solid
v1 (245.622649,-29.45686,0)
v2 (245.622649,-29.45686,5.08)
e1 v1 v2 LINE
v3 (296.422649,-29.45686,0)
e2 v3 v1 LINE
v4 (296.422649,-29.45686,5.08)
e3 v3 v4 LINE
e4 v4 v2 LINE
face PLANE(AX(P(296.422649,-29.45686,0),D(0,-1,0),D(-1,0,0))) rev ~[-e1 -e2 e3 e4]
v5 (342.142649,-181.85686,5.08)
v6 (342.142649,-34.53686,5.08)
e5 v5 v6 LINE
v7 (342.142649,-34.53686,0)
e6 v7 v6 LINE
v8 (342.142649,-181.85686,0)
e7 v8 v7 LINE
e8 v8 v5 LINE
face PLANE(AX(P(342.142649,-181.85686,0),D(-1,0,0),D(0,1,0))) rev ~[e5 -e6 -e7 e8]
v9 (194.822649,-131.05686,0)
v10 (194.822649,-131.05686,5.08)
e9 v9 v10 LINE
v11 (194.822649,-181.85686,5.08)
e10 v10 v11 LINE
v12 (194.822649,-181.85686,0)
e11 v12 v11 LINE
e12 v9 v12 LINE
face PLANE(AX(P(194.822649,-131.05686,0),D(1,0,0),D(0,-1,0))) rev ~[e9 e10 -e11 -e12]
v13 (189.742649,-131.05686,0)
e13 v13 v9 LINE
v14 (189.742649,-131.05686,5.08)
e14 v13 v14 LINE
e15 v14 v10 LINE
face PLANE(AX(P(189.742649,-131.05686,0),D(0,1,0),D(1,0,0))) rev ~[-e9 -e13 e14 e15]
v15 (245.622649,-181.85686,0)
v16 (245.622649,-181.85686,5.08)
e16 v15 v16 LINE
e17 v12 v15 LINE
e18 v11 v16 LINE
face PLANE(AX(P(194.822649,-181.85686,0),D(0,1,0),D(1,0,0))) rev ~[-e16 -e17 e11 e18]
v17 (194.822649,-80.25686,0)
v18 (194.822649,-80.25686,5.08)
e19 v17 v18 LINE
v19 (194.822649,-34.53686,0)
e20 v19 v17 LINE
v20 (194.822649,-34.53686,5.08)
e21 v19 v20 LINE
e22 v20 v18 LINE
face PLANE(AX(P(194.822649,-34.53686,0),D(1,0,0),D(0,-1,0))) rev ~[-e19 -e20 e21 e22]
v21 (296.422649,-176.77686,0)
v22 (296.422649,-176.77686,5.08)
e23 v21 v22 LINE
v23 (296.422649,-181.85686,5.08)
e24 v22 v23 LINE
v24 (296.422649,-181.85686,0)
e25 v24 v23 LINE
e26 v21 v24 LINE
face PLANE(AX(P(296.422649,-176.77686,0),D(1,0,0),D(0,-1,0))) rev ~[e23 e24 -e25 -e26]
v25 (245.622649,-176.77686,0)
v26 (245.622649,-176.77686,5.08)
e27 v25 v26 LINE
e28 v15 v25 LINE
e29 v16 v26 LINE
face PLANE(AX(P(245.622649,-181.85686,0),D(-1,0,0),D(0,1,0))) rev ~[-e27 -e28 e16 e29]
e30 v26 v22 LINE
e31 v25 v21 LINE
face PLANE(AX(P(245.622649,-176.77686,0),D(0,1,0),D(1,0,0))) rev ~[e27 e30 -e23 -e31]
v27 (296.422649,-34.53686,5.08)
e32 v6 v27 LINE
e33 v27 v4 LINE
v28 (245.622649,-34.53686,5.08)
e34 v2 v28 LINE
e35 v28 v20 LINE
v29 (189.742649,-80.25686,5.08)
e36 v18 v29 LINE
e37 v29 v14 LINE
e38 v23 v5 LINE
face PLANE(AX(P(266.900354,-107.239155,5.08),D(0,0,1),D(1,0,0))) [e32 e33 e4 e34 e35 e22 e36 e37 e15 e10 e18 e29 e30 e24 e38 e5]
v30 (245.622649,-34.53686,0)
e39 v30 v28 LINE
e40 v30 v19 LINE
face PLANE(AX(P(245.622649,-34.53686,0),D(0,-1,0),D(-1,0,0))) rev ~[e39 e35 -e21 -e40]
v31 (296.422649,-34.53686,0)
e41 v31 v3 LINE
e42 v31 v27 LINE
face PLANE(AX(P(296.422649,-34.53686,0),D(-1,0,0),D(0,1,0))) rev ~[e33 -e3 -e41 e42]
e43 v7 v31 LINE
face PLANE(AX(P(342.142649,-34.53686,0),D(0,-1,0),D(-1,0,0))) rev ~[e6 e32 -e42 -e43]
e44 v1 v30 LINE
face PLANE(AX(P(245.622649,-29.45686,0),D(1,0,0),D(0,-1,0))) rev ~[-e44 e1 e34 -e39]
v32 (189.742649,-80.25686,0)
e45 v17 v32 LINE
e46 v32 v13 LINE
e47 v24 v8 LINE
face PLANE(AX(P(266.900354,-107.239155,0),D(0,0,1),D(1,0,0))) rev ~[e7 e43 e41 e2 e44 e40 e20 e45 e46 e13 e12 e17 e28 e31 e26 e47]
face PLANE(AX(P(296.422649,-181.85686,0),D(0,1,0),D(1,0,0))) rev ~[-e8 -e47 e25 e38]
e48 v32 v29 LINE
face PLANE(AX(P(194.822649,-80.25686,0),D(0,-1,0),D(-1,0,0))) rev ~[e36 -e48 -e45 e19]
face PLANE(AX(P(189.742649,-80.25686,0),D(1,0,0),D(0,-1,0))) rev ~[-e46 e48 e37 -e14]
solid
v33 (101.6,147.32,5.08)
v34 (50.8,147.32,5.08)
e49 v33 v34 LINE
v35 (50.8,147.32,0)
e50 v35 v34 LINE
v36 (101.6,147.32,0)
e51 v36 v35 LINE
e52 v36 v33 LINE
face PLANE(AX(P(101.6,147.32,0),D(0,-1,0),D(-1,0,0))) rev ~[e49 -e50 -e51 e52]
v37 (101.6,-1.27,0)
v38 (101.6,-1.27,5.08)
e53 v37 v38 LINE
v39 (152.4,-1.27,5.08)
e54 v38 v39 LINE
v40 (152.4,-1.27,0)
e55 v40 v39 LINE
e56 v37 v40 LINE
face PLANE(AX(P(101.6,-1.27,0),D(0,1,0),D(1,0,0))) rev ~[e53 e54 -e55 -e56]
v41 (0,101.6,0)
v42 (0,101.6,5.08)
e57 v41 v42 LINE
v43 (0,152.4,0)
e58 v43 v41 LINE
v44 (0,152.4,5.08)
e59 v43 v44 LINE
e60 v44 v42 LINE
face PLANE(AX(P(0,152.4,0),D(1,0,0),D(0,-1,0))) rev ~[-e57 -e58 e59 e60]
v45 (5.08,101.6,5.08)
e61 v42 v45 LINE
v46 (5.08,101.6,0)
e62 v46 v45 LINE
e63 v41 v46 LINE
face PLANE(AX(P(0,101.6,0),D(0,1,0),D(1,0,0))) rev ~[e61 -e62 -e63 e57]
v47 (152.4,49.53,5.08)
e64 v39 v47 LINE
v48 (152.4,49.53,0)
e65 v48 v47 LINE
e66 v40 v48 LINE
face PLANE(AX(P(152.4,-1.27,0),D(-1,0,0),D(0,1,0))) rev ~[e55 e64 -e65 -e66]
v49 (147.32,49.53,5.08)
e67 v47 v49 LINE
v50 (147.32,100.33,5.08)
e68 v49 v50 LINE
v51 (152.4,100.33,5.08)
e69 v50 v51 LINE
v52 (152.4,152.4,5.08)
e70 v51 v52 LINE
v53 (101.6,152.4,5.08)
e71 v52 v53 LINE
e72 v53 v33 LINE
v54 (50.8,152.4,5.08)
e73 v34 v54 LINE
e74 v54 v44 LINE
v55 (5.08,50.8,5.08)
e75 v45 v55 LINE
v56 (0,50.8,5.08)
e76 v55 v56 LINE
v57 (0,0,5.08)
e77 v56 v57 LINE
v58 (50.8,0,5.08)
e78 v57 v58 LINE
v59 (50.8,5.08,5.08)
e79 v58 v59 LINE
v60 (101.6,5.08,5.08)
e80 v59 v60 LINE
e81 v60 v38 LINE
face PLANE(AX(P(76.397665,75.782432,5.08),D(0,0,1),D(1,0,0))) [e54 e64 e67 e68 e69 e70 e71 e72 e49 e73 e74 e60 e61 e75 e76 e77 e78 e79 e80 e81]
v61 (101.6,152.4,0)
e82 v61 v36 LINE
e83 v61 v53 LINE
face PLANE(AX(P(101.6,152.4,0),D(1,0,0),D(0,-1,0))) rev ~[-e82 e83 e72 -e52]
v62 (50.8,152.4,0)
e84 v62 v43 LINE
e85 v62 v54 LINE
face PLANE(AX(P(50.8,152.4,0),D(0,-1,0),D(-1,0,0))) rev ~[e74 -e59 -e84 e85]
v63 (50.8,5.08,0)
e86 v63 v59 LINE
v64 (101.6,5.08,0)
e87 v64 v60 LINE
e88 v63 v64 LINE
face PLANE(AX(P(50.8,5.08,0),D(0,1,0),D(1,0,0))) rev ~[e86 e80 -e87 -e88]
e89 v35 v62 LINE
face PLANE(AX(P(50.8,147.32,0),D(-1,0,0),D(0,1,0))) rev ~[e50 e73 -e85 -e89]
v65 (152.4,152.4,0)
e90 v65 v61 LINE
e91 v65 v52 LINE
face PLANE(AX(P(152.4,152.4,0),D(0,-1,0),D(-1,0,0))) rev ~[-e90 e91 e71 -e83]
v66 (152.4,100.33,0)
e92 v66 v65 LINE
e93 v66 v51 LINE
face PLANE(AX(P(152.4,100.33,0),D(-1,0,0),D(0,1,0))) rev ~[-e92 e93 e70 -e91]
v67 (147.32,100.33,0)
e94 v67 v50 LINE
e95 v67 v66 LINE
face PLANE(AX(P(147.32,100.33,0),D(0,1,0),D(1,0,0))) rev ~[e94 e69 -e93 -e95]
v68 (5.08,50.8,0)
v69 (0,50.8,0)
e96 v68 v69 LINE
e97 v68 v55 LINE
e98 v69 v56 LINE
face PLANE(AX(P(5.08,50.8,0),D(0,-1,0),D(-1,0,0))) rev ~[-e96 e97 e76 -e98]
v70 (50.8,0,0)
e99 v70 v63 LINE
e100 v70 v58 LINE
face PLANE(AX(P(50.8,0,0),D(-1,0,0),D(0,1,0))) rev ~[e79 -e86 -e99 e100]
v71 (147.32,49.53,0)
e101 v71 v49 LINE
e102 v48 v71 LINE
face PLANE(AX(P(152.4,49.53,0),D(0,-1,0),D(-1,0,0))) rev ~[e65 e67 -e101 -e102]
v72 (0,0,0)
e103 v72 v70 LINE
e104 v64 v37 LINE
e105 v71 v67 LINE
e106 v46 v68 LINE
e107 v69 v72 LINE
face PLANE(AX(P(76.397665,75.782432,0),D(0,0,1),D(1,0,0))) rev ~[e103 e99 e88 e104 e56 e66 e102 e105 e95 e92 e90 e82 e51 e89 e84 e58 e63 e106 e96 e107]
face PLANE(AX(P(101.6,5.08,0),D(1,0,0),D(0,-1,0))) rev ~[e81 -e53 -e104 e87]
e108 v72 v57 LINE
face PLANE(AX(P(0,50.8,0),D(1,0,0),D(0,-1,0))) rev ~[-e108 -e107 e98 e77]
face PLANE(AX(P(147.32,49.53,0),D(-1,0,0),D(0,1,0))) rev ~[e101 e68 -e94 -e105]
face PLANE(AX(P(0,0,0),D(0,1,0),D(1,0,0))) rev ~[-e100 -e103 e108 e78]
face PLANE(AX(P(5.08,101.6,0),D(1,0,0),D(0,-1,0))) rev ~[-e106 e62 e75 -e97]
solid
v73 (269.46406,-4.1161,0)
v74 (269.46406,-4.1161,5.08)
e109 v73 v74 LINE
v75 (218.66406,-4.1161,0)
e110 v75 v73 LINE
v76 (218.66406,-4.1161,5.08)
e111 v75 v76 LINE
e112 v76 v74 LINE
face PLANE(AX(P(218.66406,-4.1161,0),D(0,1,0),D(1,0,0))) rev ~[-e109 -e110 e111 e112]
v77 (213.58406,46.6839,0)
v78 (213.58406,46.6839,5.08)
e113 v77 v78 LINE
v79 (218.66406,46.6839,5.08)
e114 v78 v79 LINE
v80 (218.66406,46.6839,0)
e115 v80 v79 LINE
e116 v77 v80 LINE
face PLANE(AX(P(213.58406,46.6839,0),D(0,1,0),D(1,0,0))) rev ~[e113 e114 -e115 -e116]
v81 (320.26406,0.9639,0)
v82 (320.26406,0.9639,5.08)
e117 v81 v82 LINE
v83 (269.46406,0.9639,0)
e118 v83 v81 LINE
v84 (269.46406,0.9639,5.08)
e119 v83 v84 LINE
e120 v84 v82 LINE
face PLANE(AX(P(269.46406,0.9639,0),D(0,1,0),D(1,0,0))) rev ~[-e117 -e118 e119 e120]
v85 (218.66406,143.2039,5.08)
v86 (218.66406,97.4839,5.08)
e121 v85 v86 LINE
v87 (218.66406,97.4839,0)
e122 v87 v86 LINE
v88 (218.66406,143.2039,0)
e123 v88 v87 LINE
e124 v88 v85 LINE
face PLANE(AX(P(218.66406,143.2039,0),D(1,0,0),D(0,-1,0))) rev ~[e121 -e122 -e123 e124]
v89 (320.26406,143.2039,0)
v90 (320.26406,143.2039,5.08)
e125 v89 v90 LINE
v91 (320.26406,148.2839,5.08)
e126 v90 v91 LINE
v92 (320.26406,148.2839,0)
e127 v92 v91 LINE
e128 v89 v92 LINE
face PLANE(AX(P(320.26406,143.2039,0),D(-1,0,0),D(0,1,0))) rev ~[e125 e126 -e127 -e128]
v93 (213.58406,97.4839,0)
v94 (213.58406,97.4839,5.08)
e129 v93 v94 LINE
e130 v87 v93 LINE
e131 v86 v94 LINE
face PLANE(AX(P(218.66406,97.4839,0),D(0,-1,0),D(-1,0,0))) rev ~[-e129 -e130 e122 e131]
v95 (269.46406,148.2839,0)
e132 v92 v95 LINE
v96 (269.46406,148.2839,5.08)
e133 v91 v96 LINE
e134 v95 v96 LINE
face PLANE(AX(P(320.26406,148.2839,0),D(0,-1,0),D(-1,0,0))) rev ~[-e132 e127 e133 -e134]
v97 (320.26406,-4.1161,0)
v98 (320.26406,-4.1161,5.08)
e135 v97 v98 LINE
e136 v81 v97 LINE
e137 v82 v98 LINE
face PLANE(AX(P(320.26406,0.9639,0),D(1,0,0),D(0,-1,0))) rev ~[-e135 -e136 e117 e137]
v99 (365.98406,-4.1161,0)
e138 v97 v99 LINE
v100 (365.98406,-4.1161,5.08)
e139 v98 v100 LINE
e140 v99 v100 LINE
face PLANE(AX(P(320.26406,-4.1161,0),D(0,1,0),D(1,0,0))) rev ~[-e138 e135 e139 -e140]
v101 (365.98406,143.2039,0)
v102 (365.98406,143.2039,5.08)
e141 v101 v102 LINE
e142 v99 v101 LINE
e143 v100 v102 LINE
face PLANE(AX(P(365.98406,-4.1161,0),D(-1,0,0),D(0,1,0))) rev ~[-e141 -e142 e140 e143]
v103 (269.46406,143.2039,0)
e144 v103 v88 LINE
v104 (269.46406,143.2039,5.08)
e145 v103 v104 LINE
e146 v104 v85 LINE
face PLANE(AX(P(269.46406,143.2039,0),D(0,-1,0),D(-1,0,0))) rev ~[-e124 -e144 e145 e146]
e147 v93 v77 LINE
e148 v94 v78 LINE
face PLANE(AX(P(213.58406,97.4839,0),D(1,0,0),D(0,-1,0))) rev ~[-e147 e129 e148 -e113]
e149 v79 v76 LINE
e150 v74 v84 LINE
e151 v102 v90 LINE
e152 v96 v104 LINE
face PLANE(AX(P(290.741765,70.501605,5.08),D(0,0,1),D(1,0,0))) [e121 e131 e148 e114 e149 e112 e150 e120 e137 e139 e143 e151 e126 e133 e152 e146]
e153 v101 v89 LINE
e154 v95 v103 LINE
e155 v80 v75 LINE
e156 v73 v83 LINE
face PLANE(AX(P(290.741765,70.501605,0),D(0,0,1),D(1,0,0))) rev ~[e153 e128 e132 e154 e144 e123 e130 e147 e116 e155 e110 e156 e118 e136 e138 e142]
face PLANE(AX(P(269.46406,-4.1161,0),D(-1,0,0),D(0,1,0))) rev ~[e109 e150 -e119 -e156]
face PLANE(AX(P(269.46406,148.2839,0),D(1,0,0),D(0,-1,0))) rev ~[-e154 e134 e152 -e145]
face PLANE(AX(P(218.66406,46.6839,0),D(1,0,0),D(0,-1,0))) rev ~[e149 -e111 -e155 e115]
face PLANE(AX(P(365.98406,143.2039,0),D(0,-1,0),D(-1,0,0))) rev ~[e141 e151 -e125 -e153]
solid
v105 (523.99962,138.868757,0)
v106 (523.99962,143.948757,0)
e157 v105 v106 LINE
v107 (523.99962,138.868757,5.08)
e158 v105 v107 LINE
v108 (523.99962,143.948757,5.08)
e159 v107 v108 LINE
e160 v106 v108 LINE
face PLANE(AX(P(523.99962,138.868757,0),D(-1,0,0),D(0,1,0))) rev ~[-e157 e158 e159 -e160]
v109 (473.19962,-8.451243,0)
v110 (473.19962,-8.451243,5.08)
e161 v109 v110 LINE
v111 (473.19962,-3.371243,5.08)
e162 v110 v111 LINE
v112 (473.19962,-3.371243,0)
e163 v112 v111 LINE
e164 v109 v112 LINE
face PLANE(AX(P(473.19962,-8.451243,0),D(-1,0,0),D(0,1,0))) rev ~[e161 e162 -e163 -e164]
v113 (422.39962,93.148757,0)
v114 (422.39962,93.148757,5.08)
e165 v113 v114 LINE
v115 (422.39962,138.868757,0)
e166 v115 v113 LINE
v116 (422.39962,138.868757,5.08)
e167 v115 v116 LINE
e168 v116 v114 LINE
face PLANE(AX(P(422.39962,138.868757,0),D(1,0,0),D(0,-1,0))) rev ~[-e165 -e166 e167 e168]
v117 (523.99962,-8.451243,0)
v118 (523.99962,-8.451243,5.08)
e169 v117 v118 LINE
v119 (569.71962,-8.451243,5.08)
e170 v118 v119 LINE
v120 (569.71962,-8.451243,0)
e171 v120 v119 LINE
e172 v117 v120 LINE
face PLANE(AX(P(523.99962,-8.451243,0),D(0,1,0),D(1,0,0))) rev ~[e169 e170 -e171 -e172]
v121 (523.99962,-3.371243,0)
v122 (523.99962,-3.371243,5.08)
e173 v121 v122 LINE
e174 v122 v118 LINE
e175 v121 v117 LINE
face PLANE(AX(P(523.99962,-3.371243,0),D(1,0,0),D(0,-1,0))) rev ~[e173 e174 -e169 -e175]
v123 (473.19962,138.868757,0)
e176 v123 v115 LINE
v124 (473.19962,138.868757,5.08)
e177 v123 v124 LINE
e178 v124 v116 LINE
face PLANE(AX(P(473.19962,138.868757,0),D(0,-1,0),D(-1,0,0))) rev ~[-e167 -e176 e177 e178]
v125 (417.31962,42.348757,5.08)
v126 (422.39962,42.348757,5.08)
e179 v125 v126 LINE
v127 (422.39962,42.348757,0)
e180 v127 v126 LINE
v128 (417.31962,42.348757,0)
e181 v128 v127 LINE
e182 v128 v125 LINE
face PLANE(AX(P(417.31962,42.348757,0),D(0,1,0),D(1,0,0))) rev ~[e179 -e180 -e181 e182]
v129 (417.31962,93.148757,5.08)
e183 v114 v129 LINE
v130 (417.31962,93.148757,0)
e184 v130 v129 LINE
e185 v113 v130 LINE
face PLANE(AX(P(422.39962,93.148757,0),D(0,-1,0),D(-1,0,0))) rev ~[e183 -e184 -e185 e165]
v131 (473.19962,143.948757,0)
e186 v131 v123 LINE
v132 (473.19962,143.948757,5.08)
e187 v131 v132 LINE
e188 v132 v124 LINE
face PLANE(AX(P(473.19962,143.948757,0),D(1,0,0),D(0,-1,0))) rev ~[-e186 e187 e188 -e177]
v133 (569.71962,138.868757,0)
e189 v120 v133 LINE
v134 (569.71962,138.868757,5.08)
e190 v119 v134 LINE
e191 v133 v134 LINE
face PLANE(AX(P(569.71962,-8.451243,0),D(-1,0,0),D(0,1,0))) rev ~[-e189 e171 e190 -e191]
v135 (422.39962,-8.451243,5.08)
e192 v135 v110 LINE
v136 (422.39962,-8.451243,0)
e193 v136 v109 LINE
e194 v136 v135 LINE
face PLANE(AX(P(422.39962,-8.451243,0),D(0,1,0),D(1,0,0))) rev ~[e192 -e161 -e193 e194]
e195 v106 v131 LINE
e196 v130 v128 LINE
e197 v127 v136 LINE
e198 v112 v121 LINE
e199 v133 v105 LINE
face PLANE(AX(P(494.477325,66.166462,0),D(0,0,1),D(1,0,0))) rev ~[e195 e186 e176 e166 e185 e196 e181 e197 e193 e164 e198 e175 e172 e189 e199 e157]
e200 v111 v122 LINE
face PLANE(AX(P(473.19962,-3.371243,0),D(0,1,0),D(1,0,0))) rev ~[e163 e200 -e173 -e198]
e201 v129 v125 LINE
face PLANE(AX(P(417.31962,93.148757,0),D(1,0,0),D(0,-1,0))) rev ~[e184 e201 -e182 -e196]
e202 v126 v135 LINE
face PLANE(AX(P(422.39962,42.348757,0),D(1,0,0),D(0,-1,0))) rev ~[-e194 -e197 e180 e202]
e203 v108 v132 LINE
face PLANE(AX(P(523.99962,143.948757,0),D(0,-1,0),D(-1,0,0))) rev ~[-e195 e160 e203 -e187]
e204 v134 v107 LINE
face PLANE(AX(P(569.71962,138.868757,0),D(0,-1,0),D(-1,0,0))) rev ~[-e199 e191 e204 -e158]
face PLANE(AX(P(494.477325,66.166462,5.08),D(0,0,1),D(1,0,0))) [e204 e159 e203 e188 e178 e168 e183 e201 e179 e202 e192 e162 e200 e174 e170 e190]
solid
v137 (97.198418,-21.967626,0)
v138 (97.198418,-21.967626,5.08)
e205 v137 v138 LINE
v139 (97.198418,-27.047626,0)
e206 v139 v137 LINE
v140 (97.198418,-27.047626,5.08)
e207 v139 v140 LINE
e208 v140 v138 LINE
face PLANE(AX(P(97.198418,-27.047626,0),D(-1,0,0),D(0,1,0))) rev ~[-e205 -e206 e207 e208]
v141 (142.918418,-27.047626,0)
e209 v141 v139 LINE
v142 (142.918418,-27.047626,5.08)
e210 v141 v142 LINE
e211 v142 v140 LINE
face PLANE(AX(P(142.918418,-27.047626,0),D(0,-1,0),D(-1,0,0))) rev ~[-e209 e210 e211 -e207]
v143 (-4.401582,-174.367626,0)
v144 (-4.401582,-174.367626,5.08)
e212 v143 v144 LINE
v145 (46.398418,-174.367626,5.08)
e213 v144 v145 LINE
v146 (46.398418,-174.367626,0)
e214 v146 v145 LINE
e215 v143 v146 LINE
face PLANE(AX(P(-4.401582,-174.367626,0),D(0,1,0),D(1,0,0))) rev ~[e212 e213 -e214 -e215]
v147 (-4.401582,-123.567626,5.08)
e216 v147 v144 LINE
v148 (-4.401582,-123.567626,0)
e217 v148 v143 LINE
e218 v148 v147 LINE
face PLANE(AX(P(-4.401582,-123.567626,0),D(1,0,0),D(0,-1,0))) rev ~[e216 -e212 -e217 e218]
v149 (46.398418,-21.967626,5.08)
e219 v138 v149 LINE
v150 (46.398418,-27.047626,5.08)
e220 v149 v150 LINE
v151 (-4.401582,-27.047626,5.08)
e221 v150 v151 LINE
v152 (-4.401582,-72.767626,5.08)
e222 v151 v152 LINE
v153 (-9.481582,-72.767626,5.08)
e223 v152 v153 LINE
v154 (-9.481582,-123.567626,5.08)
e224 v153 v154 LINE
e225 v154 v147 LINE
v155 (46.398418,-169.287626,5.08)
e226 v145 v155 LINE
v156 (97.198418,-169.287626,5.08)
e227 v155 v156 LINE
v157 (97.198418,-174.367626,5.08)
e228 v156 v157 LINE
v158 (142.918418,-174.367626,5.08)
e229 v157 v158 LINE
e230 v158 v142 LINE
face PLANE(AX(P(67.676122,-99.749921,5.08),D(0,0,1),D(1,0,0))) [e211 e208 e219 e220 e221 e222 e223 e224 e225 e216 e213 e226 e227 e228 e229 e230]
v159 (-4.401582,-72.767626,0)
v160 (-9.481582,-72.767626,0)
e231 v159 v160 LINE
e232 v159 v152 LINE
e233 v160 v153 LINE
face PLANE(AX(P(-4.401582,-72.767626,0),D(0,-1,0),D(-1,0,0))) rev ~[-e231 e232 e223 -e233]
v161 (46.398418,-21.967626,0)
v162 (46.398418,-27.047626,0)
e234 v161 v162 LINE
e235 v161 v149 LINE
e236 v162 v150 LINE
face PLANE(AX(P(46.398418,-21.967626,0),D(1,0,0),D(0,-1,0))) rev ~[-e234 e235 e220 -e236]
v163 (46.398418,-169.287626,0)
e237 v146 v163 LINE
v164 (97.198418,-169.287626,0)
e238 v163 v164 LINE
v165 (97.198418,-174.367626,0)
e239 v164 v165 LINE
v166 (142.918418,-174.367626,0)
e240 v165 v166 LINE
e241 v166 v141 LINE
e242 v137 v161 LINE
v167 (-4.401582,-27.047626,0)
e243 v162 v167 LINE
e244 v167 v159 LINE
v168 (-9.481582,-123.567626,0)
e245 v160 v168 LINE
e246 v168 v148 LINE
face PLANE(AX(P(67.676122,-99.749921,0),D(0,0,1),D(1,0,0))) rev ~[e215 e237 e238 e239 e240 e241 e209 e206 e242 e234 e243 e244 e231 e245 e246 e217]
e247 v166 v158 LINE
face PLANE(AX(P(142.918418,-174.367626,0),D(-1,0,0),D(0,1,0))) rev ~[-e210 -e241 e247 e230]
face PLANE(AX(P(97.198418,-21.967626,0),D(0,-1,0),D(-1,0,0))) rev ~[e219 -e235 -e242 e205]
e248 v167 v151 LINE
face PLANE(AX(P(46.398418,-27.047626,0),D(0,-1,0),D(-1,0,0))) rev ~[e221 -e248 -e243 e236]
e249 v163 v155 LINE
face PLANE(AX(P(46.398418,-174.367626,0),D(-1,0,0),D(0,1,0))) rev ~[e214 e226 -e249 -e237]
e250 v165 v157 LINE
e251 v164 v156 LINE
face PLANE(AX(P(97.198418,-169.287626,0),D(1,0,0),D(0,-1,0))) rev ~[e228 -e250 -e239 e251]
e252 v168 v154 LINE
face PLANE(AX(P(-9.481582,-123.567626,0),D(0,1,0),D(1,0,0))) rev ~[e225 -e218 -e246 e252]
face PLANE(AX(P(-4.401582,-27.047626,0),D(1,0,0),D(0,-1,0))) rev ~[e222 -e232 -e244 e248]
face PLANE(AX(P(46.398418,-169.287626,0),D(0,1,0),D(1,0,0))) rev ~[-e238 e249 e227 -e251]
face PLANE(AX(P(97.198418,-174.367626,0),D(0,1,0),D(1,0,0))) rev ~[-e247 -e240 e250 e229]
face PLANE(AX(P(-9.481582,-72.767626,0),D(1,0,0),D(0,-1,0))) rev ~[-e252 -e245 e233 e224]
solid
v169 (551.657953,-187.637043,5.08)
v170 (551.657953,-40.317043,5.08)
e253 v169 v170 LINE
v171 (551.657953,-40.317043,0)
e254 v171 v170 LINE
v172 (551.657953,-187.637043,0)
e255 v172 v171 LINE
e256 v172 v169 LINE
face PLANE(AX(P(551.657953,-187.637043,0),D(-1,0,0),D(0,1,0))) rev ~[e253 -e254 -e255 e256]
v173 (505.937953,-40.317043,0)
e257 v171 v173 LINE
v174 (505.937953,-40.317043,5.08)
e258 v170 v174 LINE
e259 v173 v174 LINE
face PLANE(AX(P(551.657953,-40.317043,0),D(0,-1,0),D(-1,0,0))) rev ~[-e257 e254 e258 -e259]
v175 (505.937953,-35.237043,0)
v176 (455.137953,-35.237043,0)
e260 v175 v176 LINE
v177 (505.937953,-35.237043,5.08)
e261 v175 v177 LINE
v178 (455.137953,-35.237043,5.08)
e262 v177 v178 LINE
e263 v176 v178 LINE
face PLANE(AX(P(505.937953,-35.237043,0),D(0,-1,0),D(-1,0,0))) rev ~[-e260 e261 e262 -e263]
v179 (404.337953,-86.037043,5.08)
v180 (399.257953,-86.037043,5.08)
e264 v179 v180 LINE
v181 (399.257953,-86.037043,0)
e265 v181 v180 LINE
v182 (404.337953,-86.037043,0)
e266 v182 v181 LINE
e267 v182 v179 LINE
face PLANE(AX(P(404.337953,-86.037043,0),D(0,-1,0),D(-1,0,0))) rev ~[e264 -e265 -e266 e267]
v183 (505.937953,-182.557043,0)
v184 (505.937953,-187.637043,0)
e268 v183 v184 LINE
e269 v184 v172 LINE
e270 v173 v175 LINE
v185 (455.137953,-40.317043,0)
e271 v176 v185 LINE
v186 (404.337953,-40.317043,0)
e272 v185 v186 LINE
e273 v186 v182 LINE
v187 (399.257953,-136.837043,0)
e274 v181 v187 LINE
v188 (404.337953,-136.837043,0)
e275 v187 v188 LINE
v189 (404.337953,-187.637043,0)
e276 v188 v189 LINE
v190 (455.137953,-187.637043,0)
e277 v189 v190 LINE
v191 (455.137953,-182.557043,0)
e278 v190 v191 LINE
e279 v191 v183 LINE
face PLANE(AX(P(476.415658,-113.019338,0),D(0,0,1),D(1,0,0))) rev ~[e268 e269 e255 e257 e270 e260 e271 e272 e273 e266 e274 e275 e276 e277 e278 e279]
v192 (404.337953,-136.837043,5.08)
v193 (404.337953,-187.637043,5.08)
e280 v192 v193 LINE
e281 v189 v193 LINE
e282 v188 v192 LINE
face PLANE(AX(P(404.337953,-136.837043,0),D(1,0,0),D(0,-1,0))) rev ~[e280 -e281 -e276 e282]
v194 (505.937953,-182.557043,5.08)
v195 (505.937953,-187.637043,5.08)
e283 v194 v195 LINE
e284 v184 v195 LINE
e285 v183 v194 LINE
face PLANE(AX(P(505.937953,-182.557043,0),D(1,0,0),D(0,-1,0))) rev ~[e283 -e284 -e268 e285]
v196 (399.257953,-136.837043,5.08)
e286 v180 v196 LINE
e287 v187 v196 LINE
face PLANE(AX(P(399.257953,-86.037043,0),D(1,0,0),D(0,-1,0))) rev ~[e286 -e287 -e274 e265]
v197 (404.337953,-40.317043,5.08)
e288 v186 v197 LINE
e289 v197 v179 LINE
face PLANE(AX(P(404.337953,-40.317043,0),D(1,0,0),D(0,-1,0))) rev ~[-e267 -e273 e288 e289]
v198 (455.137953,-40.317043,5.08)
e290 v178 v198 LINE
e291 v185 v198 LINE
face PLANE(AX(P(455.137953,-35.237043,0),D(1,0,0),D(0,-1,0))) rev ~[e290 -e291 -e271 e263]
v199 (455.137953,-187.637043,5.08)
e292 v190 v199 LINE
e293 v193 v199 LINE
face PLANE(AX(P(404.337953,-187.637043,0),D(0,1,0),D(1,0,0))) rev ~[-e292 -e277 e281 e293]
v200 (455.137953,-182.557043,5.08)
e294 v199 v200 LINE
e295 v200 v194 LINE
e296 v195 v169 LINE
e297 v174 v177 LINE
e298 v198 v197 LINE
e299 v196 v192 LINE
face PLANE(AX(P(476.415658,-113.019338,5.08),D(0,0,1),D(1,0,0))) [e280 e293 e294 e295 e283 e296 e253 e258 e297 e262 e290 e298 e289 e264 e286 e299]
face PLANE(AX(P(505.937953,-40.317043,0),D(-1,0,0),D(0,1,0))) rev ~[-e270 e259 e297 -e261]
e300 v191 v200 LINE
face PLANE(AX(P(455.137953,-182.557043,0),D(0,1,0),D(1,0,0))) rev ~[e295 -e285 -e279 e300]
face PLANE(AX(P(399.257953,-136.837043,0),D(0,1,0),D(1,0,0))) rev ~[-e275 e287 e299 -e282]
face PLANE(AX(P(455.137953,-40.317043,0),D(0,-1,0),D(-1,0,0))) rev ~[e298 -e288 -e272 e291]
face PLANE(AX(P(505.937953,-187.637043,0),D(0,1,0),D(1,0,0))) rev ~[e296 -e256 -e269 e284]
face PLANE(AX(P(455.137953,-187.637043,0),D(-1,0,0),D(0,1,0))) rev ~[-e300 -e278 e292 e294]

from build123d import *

# Parameters (mm, degrees)
F1_DEPTH = 5.08


# Not quite as in the source:
# - a feature names something its author has since deleted; it is built from what else it names


with BuildPart() as f1:
    # F0 (on Top) → F1 (new body)
    with BuildSketch(Plane.XY):
        Polygon((0, 152.4), (0, 101.6), (5.08, 101.6), (5.08, 50.8), (0, 50.8), (0, 0), (50.8, 0), (50.8, 5.08), (101.6, 5.08), (101.6, -1.27), (152.4, -1.27), (152.4, 49.53), (147.32, 49.53), (147.32, 100.33), (152.4, 100.33), (152.4, 152.4), (101.6, 152.4), (101.6, 147.32), (50.8, 147.32), (50.8, 152.4), align=None)
    extrude(amount=F1_DEPTH)


with BuildPart() as f1b:
    # F0 (on Top) → F1, piece 2 (new body)
    with BuildSketch(Plane.XY):
        Polygon((46.398417536, -27.047626133), (-4.401582464, -27.047626133), (-4.401582464, -72.767626133), (-9.481582464, -72.767626133), (-9.481582464, -123.567626133), (-4.401582464, -123.567626133), (-4.401582464, -174.367626133), (46.398417536, -174.367626133), (46.398417536, -169.287626133), (97.198417536, -169.287626133), (97.198417536, -174.367626133), (142.918417536, -174.367626133), (142.918417536, -27.047626133), (97.198417536, -27.047626133), (97.198417536, -21.967626133), (46.398417536, -21.967626133), align=None)
    extrude(amount=F1_DEPTH)


with BuildPart() as f1c:
    # F0 (on Top) → F1, piece 3 (new body)
    with BuildSketch(Plane.XY):
        Polygon((269.4640602303, 143.2038998055), (218.6640602303, 143.2038998055), (218.6640602303, 97.4838998055), (213.5840602303, 97.4838998055), (213.5840602303, 46.6838998055), (218.6640602303, 46.6838998055), (218.6640602303, -4.1161001945), (269.4640602303, -4.1161001945), (269.4640602303, 0.9638998055), (320.2640602303, 0.9638998055), (320.2640602303, -4.1161001945), (365.9840602303, -4.1161001945), (365.9840602303, 143.2038998055), (320.2640602303, 143.2038998055), (320.2640602303, 148.2838998055), (269.4640602303, 148.2838998055), align=None)
    extrude(amount=F1_DEPTH)


with BuildPart() as f1d:
    # F0 (on Top) → F1, piece 4 (new body)
    with BuildSketch(Plane.XY):
        Polygon((473.199620409, 138.8687571335), (422.399620409, 138.8687571335), (422.399620409, 93.1487571335), (417.319620409, 93.1487571335), (417.319620409, 42.3487571335), (422.399620409, 42.3487571335), (422.399620409, -8.4512428665), (473.199620409, -8.4512428665), (473.199620409, -3.3712428665), (523.999620409, -3.3712428665), (523.999620409, -8.4512428665), (569.719620409, -8.4512428665), (569.719620409, 138.8687571335), (523.999620409, 138.8687571335), (523.999620409, 143.9487571335), (473.199620409, 143.9487571335), align=None)
    extrude(amount=F1_DEPTH)


with BuildPart() as f1e:
    # F0 (on Top) → F1, piece 5 (new body)
    with BuildSketch(Plane.XY):
        Polygon((455.1379527283, -40.3170431209), (404.3379527283, -40.3170431209), (404.3379527283, -86.0370431209), (399.2579527283, -86.0370431209), (399.2579527283, -136.8370431209), (404.3379527283, -136.8370431209), (404.3379527283, -187.6370431209), (455.1379527283, -187.6370431209), (455.1379527283, -182.5570431209), (505.9379527283, -182.5570431209), (505.9379527283, -187.6370431209), (551.6579527283, -187.6370431209), (551.6579527283, -40.3170431209), (505.9379527283, -40.3170431209), (505.9379527283, -35.2370431209), (455.1379527283, -35.2370431209), align=None)
    extrude(amount=F1_DEPTH)


with BuildPart() as f1f:
    # F0 (on Top) → F1, piece 6 (new body)
    with BuildSketch(Plane.XY):
        Polygon((245.6226493549, -34.536860342), (194.8226493549, -34.536860342), (194.8226493549, -80.256860342), (189.7426493549, -80.256860342), (189.7426493549, -131.056860342), (194.8226493549, -131.056860342), (194.8226493549, -181.856860342), (245.6226493549, -181.856860342), (245.6226493549, -176.776860342), (296.4226493549, -176.776860342), (296.4226493549, -181.856860342), (342.1426493549, -181.856860342), (342.1426493549, -34.536860342), (296.4226493549, -34.536860342), (296.4226493549, -29.456860342), (245.6226493549, -29.456860342), align=None)
    extrude(amount=F1_DEPTH)


solid = Compound([f1.part, f1b.part, f1c.part, f1d.part, f1e.part, f1f.part])
